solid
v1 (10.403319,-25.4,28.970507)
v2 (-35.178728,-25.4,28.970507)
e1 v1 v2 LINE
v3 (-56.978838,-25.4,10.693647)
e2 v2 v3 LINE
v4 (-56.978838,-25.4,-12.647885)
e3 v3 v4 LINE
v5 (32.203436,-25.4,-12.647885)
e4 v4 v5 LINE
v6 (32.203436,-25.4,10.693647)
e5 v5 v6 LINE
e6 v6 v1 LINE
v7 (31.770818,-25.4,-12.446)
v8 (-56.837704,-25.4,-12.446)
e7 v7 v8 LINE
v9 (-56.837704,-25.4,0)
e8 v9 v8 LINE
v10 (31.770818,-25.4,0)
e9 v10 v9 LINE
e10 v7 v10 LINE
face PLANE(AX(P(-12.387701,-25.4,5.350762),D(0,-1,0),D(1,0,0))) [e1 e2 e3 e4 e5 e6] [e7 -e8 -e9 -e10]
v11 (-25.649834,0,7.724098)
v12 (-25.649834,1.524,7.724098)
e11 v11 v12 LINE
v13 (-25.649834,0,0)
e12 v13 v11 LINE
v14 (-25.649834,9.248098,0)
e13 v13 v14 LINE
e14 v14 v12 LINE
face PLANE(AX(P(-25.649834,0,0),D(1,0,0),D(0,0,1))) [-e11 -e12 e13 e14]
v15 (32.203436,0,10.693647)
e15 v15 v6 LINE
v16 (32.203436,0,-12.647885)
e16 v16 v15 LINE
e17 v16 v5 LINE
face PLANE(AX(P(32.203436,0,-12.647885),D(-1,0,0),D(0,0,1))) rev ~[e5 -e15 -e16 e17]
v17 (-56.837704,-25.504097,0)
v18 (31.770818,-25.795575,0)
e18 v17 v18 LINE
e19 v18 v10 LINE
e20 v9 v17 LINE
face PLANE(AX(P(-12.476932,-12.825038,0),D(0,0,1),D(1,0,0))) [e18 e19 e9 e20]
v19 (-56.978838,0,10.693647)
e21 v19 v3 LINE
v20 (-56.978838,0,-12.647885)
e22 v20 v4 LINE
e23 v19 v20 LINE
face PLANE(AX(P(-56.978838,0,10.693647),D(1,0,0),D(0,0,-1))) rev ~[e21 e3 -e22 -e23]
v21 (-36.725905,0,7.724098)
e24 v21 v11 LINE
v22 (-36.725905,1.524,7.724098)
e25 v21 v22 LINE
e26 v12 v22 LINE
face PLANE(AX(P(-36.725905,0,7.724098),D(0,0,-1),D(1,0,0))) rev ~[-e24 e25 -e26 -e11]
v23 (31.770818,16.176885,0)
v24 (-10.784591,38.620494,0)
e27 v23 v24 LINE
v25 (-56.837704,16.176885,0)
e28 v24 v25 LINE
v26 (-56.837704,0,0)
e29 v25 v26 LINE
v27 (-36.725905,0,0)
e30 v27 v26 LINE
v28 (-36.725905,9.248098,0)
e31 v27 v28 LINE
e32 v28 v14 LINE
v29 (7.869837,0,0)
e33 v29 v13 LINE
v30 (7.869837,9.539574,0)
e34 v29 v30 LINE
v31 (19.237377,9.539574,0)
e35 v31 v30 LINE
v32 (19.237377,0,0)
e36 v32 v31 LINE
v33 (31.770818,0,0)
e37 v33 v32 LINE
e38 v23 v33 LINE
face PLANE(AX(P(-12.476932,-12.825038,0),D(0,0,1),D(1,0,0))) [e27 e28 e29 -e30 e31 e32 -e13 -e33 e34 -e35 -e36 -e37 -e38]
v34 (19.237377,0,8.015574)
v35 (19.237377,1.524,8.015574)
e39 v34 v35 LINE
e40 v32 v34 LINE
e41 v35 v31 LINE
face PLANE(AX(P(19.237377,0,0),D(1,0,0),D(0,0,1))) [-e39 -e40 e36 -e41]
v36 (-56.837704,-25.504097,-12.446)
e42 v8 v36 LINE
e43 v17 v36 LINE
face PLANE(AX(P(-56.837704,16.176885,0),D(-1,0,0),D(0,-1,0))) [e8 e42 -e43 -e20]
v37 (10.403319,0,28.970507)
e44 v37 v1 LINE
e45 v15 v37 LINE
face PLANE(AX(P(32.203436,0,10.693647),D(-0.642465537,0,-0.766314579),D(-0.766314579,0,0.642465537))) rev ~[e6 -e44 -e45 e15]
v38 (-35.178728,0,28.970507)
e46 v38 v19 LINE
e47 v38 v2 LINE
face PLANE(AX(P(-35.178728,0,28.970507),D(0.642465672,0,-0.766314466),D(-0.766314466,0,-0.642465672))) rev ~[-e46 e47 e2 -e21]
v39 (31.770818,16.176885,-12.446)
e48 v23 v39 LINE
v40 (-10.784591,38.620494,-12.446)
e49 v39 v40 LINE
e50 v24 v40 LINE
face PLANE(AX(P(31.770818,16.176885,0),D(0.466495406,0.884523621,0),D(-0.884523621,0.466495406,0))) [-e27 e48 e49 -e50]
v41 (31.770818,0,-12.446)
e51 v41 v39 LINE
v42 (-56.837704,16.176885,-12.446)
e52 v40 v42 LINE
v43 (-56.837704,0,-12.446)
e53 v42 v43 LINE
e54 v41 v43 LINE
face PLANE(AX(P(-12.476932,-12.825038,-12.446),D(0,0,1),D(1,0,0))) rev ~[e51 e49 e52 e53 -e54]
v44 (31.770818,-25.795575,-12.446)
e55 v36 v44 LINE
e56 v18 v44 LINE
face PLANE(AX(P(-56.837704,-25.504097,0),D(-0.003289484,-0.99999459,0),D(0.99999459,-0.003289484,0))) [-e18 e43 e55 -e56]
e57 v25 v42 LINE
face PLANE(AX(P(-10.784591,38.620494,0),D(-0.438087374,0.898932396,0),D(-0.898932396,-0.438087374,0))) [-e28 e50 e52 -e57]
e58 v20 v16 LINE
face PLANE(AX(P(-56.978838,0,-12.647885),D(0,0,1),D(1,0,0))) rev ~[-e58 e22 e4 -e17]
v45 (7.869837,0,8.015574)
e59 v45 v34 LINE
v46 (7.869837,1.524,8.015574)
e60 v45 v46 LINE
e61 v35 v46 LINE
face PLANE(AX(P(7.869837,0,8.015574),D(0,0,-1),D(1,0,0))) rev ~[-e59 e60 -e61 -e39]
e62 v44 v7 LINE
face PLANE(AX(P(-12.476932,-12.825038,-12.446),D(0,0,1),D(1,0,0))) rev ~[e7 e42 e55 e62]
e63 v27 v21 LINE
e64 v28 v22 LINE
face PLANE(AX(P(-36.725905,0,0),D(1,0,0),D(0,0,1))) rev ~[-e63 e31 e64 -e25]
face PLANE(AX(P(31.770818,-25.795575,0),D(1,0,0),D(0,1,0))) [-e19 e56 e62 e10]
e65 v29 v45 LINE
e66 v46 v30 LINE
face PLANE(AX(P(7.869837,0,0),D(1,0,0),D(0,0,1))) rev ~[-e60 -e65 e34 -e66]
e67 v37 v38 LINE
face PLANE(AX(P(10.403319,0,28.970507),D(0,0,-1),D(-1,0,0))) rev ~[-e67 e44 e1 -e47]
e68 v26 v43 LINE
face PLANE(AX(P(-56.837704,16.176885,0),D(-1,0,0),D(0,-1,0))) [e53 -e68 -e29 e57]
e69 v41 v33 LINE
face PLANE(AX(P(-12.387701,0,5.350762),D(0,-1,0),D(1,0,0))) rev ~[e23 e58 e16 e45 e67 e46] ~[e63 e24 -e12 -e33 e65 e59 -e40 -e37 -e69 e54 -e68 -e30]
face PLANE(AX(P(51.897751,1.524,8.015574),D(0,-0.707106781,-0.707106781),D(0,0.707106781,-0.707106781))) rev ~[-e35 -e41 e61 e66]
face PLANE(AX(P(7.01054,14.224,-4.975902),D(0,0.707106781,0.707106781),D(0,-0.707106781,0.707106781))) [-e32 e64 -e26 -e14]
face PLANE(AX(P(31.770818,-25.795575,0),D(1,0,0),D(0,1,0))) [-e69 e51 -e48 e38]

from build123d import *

# Parameters (mm, degrees)
F1_DEPTH    = 25.4
F3_DEPTH    = 12.446
F4_W        = 11.3675398752
F4_H        = 8.0155739561
F4_W_2      = 11.0760703683
F4_H_2      = 7.7240983956
F5_DEPTH    = 14.224
F6_T4_DEPTH = 76.6882877695
F7_T4_DEPTH = 76.3968182626


# Not quite as in the source:
# - a fillet or chamfer that OpenCascade refuses, or shapes differently, is made with other operations: its cross-section is extruded or revolved along the edge and cut away or added


with BuildPart() as f1:
    # F0 (on Front) → F1 (new body)
    with BuildSketch(Plane.XZ):
        Polygon((-56.9788375091, 10.6936474436), (-56.9788375091, -12.6478849719), (32.2034358534, -12.6478849719), (32.2034358534, 10.6936474436), (10.4033187203, 28.9705070476), (-35.1787281407, 28.9705070476), align=None)
    extrude(amount=F1_DEPTH)

    # F2 (on Top) → F3 (join)
    with BuildSketch(Plane.XY):
        Polygon((-56.8377040327, 0), (-56.8377040327, -25.5040973425), (31.7708179355, -25.7955752313), (31.7708179355, 0), align=None)
        Polygon((-56.8377040327, 16.1768849939), (-56.8377040327, 0), (31.7708179355, 0), (31.7708179355, 16.1768849939), (-10.7845906168, 38.6204943061), align=None)
    extrude(amount=-F3_DEPTH)

    # F4 (on Front) → F5 (join)
    with BuildSketch(Plane.XZ):
        with Locations((13.5536068119, 4.007786978)):
            Rectangle(F4_W, F4_H)
        with Locations((-31.1878696084, 3.8620491978)):
            Rectangle(F4_W_2, F4_H_2)
    extrude(amount=-F5_DEPTH)

    # F6: chamfer of 12.7 on 1 edges, made by hand


with BuildPart() as f6_tool2:
    # F6_s3 → F6_t4 (new body)
    with BuildSketch(Plane.YZ.offset(51.8977506967)):
        Polygon((1.524, 8.0155739561), (14.224, -4.6844260439), (14.224, 8.0155739561), align=None)
    extrude(amount=-F6_T4_DEPTH)

    split(bisect_by=Plane.XY, keep=Keep.TOP)


with BuildPart() as f1_1:
    add(f1.part)

    # F6_t1: cut F6_tool2
    add(f6_tool2.part, mode=Mode.SUBTRACT)

    # F7: chamfer of 12.7 on 1 edges, made by hand


with BuildPart() as f7_tool2:
    # F7_s3 → F7_t4 (new body)
    with BuildSketch(Plane.YZ.offset(7.0105395229)):
        Polygon((14.224, -4.9759016044), (1.524, 7.7240983956), (14.224, 7.7240983956), align=None)
    extrude(amount=-F7_T4_DEPTH)

    split(bisect_by=Plane.XY, keep=Keep.TOP)


with BuildPart() as f1_2:
    add(f1_1.part)

    # F7_t1: cut F7_tool2
    add(f7_tool2.part, mode=Mode.SUBTRACT)


solid = f1_2.part
